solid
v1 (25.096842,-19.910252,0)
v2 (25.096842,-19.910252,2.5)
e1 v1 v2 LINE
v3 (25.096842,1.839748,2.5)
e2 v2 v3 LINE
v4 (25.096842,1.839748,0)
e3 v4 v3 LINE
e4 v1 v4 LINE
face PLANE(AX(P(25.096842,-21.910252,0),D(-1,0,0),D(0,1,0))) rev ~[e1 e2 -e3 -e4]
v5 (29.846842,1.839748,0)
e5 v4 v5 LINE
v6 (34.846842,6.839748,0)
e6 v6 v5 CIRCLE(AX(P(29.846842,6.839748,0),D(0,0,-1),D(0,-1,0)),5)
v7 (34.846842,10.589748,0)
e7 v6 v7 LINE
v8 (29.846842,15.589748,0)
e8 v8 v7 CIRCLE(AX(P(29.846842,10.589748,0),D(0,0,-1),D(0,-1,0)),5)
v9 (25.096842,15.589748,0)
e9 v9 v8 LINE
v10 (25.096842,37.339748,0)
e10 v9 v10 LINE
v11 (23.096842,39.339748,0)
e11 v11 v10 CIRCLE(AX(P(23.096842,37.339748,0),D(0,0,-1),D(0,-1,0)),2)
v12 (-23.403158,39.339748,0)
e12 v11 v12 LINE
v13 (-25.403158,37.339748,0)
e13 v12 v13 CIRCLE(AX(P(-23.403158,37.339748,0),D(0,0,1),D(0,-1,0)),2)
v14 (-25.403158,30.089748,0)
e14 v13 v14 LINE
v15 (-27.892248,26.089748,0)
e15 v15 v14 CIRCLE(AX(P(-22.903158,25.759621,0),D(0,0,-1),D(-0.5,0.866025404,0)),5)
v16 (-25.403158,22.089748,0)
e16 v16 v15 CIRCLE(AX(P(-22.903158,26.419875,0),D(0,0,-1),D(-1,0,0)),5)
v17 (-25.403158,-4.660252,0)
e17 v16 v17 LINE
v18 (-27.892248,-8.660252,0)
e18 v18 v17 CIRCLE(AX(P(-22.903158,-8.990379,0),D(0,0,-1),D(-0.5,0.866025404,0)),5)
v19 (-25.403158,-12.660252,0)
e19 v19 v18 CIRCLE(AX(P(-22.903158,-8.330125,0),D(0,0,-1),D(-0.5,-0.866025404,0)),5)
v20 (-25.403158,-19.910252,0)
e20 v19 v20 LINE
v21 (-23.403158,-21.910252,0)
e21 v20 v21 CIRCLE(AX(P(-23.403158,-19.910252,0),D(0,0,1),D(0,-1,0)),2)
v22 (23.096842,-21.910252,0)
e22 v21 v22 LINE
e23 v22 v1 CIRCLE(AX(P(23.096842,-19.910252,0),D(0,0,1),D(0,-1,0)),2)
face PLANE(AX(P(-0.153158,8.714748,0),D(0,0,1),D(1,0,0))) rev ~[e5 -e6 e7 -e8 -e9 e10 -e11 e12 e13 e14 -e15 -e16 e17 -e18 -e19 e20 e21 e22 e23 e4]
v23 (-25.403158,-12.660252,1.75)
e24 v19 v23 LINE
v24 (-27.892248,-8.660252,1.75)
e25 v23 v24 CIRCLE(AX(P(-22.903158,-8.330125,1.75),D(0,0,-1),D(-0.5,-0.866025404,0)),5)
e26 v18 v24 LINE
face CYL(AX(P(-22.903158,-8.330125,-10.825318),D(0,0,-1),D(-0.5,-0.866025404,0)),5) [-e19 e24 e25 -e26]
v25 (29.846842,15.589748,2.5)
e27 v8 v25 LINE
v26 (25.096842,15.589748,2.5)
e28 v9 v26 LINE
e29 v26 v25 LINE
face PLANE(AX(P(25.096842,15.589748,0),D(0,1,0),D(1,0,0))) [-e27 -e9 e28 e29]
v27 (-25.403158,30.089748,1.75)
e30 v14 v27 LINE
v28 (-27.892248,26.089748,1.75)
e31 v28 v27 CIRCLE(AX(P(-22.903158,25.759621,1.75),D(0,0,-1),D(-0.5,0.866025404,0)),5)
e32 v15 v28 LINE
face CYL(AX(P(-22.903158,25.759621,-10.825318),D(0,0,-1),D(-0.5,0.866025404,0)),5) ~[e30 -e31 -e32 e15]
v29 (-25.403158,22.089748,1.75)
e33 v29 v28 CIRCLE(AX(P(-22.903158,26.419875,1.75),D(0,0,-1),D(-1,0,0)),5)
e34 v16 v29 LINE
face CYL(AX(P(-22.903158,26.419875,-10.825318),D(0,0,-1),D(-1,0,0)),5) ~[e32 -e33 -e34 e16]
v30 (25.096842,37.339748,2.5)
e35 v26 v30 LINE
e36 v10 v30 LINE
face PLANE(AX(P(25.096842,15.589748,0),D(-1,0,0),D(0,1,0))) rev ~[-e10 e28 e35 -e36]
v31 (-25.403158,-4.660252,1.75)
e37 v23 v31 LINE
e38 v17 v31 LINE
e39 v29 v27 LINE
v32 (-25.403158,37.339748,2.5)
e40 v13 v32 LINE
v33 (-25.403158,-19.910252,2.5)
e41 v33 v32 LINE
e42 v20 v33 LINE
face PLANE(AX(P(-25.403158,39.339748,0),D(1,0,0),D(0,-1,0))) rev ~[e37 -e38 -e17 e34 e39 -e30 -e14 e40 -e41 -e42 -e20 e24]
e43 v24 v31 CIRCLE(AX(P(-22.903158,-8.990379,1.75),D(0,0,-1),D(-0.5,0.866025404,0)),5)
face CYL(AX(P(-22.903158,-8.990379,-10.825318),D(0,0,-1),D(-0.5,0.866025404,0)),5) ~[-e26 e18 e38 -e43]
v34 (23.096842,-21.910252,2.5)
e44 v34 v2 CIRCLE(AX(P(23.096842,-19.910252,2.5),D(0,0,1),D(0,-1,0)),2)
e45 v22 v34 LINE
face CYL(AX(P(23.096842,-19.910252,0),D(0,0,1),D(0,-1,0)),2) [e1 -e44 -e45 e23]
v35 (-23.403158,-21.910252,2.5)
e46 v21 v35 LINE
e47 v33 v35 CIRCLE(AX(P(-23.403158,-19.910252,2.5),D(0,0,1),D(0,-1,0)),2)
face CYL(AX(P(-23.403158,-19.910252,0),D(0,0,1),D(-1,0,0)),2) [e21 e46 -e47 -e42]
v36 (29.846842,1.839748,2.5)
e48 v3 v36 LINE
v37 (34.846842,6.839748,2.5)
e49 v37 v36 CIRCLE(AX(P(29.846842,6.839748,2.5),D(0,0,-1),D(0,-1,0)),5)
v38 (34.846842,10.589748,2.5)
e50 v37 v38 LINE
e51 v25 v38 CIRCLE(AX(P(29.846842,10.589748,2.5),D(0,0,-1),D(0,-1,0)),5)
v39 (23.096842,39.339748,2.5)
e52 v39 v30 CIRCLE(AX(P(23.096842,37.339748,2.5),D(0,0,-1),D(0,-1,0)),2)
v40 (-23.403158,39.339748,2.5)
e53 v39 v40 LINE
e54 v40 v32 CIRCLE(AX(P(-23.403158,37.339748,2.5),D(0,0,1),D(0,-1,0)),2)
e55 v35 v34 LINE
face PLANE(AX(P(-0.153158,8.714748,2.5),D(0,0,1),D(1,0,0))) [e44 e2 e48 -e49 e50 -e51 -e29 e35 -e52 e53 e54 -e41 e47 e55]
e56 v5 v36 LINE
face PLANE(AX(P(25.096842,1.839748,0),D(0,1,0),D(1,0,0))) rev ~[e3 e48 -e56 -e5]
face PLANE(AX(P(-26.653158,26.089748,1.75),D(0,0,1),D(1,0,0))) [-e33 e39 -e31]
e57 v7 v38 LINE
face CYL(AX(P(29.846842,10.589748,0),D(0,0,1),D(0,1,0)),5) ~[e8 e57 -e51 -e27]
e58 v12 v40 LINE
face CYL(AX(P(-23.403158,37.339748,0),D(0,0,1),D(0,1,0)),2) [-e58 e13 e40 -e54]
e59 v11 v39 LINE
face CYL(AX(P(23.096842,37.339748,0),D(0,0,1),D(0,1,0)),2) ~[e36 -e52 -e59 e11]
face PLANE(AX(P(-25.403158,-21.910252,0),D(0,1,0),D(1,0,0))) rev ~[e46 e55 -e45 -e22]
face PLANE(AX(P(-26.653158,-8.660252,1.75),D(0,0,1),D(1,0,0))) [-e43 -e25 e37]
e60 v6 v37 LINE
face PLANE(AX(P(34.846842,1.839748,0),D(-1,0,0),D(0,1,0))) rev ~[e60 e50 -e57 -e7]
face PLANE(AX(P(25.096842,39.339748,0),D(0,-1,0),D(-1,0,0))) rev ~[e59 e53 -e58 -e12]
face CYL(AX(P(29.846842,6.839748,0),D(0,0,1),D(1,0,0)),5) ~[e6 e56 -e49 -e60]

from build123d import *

# Parameters (mm, degrees)
F0_W        = 9.75
F0_H        = 13.75
F1_DEPTH    = 2.5
F0_W_2      = 2.5
F0_H_2      = 8
F2_DEPTH    = 1.75
F3_R        = 2
F4_R        = 5
F5_T1_DEPTH = 23.4006350946


# Not quite as in the source:
# - a fillet or chamfer that OpenCascade refuses, or shapes differently, is made with other operations: its cross-section is extruded or revolved along the edge and cut away or added


with BuildPart() as f1:
    # F0 (on Top) → F1 (new body)
    with BuildSketch(Plane.XY):
        Polygon((25.0968417823, 39.3397479696), (-25.4031582177, 39.3397479696), (-25.4031582177, 30.0897479696), (-25.4031582177, 22.0897479696), (-25.4031582177, -4.6602520304), (-25.4031582177, -12.6602520304), (-25.4031582177, -21.9102520304), (25.0968417823, -21.9102520304), (25.0968417823, 1.8397479696), (25.0968417823, 15.5897479696), align=None)
        with Locations((29.9718417823, 8.7147479696)):
            Rectangle(F0_W, F0_H)
    extrude(amount=F1_DEPTH)

    # F0 (on Top) → F2 (join)
    with BuildSketch(Plane.XY):
        with Locations((-26.6531582177, 26.0897479696)):
            Rectangle(F0_W_2, F0_H_2)
        with Locations((-26.6531582177, -8.6602520304)):
            Rectangle(F0_W_2, F0_H_2)
    extrude(amount=F2_DEPTH)

    # F3
    f3_edges = [f1.edges().sort_by_distance(p)[0] for p in [
        (-25.403158, 39.339748, 1.25),
        (-25.403158, -21.910252, 1.25),
        (25.096842, -21.910252, 1.25),
        (25.096842, 39.339748, 1.25),
    ]]
    fillet(f3_edges, radius=F3_R)

    # F4
    f4_edges = [f1.edges().sort_by_distance(p)[0] for p in [
        (34.846842, 1.839748, 1.25),
        (34.846842, 15.589748, 1.25),
    ]]
    fillet(f4_edges, radius=F4_R)

    # F5: fillet of radius 5 on 4 edges, made by hand

    # F5_s2 → F5_t1 (cut)
    with BuildSketch(Plane.XY.offset(-10.8253175473)):
        with BuildLine():
            ThreePointArc((-25.4031582177, 30.0897479696), (-27.2332852366, 28.2596209506), (-27.9031582177, 25.7596209506))
            Line((-27.9031582177, 25.7596209506), (-27.9031582177, 30.0897479696))
            Line((-27.9031582177, 30.0897479696), (-25.4031582177, 30.0897479696))
        make_face()
        with BuildLine():
            ThreePointArc((-27.9031582177, 26.4198749885), (-27.2332852366, 23.9198749885), (-25.4031582177, 22.0897479696))
            Line((-25.4031582177, 22.0897479696), (-27.9031582177, 22.0897479696))
            Line((-27.9031582177, 22.0897479696), (-27.9031582177, 26.4198749885))
        make_face()
        with BuildLine():
            ThreePointArc((-25.4031582177, -4.6602520304), (-27.2332852366, -6.4903790494), (-27.9031582177, -8.9903790494))
            Line((-27.9031582177, -8.9903790494), (-27.9031582177, -4.6602520304))
            Line((-27.9031582177, -4.6602520304), (-25.4031582177, -4.6602520304))
        make_face()
        with BuildLine():
            ThreePointArc((-25.4031582177, -12.6602520304), (-27.2332852366, -10.8301250115), (-27.9031582177, -8.3301250115))
            Line((-27.9031582177, -8.3301250115), (-27.9031582177, -12.6602520304))
            Line((-27.9031582177, -12.6602520304), (-25.4031582177, -12.6602520304))
        make_face()
    extrude(amount=F5_T1_DEPTH, mode=Mode.SUBTRACT)


solid = f1.part
